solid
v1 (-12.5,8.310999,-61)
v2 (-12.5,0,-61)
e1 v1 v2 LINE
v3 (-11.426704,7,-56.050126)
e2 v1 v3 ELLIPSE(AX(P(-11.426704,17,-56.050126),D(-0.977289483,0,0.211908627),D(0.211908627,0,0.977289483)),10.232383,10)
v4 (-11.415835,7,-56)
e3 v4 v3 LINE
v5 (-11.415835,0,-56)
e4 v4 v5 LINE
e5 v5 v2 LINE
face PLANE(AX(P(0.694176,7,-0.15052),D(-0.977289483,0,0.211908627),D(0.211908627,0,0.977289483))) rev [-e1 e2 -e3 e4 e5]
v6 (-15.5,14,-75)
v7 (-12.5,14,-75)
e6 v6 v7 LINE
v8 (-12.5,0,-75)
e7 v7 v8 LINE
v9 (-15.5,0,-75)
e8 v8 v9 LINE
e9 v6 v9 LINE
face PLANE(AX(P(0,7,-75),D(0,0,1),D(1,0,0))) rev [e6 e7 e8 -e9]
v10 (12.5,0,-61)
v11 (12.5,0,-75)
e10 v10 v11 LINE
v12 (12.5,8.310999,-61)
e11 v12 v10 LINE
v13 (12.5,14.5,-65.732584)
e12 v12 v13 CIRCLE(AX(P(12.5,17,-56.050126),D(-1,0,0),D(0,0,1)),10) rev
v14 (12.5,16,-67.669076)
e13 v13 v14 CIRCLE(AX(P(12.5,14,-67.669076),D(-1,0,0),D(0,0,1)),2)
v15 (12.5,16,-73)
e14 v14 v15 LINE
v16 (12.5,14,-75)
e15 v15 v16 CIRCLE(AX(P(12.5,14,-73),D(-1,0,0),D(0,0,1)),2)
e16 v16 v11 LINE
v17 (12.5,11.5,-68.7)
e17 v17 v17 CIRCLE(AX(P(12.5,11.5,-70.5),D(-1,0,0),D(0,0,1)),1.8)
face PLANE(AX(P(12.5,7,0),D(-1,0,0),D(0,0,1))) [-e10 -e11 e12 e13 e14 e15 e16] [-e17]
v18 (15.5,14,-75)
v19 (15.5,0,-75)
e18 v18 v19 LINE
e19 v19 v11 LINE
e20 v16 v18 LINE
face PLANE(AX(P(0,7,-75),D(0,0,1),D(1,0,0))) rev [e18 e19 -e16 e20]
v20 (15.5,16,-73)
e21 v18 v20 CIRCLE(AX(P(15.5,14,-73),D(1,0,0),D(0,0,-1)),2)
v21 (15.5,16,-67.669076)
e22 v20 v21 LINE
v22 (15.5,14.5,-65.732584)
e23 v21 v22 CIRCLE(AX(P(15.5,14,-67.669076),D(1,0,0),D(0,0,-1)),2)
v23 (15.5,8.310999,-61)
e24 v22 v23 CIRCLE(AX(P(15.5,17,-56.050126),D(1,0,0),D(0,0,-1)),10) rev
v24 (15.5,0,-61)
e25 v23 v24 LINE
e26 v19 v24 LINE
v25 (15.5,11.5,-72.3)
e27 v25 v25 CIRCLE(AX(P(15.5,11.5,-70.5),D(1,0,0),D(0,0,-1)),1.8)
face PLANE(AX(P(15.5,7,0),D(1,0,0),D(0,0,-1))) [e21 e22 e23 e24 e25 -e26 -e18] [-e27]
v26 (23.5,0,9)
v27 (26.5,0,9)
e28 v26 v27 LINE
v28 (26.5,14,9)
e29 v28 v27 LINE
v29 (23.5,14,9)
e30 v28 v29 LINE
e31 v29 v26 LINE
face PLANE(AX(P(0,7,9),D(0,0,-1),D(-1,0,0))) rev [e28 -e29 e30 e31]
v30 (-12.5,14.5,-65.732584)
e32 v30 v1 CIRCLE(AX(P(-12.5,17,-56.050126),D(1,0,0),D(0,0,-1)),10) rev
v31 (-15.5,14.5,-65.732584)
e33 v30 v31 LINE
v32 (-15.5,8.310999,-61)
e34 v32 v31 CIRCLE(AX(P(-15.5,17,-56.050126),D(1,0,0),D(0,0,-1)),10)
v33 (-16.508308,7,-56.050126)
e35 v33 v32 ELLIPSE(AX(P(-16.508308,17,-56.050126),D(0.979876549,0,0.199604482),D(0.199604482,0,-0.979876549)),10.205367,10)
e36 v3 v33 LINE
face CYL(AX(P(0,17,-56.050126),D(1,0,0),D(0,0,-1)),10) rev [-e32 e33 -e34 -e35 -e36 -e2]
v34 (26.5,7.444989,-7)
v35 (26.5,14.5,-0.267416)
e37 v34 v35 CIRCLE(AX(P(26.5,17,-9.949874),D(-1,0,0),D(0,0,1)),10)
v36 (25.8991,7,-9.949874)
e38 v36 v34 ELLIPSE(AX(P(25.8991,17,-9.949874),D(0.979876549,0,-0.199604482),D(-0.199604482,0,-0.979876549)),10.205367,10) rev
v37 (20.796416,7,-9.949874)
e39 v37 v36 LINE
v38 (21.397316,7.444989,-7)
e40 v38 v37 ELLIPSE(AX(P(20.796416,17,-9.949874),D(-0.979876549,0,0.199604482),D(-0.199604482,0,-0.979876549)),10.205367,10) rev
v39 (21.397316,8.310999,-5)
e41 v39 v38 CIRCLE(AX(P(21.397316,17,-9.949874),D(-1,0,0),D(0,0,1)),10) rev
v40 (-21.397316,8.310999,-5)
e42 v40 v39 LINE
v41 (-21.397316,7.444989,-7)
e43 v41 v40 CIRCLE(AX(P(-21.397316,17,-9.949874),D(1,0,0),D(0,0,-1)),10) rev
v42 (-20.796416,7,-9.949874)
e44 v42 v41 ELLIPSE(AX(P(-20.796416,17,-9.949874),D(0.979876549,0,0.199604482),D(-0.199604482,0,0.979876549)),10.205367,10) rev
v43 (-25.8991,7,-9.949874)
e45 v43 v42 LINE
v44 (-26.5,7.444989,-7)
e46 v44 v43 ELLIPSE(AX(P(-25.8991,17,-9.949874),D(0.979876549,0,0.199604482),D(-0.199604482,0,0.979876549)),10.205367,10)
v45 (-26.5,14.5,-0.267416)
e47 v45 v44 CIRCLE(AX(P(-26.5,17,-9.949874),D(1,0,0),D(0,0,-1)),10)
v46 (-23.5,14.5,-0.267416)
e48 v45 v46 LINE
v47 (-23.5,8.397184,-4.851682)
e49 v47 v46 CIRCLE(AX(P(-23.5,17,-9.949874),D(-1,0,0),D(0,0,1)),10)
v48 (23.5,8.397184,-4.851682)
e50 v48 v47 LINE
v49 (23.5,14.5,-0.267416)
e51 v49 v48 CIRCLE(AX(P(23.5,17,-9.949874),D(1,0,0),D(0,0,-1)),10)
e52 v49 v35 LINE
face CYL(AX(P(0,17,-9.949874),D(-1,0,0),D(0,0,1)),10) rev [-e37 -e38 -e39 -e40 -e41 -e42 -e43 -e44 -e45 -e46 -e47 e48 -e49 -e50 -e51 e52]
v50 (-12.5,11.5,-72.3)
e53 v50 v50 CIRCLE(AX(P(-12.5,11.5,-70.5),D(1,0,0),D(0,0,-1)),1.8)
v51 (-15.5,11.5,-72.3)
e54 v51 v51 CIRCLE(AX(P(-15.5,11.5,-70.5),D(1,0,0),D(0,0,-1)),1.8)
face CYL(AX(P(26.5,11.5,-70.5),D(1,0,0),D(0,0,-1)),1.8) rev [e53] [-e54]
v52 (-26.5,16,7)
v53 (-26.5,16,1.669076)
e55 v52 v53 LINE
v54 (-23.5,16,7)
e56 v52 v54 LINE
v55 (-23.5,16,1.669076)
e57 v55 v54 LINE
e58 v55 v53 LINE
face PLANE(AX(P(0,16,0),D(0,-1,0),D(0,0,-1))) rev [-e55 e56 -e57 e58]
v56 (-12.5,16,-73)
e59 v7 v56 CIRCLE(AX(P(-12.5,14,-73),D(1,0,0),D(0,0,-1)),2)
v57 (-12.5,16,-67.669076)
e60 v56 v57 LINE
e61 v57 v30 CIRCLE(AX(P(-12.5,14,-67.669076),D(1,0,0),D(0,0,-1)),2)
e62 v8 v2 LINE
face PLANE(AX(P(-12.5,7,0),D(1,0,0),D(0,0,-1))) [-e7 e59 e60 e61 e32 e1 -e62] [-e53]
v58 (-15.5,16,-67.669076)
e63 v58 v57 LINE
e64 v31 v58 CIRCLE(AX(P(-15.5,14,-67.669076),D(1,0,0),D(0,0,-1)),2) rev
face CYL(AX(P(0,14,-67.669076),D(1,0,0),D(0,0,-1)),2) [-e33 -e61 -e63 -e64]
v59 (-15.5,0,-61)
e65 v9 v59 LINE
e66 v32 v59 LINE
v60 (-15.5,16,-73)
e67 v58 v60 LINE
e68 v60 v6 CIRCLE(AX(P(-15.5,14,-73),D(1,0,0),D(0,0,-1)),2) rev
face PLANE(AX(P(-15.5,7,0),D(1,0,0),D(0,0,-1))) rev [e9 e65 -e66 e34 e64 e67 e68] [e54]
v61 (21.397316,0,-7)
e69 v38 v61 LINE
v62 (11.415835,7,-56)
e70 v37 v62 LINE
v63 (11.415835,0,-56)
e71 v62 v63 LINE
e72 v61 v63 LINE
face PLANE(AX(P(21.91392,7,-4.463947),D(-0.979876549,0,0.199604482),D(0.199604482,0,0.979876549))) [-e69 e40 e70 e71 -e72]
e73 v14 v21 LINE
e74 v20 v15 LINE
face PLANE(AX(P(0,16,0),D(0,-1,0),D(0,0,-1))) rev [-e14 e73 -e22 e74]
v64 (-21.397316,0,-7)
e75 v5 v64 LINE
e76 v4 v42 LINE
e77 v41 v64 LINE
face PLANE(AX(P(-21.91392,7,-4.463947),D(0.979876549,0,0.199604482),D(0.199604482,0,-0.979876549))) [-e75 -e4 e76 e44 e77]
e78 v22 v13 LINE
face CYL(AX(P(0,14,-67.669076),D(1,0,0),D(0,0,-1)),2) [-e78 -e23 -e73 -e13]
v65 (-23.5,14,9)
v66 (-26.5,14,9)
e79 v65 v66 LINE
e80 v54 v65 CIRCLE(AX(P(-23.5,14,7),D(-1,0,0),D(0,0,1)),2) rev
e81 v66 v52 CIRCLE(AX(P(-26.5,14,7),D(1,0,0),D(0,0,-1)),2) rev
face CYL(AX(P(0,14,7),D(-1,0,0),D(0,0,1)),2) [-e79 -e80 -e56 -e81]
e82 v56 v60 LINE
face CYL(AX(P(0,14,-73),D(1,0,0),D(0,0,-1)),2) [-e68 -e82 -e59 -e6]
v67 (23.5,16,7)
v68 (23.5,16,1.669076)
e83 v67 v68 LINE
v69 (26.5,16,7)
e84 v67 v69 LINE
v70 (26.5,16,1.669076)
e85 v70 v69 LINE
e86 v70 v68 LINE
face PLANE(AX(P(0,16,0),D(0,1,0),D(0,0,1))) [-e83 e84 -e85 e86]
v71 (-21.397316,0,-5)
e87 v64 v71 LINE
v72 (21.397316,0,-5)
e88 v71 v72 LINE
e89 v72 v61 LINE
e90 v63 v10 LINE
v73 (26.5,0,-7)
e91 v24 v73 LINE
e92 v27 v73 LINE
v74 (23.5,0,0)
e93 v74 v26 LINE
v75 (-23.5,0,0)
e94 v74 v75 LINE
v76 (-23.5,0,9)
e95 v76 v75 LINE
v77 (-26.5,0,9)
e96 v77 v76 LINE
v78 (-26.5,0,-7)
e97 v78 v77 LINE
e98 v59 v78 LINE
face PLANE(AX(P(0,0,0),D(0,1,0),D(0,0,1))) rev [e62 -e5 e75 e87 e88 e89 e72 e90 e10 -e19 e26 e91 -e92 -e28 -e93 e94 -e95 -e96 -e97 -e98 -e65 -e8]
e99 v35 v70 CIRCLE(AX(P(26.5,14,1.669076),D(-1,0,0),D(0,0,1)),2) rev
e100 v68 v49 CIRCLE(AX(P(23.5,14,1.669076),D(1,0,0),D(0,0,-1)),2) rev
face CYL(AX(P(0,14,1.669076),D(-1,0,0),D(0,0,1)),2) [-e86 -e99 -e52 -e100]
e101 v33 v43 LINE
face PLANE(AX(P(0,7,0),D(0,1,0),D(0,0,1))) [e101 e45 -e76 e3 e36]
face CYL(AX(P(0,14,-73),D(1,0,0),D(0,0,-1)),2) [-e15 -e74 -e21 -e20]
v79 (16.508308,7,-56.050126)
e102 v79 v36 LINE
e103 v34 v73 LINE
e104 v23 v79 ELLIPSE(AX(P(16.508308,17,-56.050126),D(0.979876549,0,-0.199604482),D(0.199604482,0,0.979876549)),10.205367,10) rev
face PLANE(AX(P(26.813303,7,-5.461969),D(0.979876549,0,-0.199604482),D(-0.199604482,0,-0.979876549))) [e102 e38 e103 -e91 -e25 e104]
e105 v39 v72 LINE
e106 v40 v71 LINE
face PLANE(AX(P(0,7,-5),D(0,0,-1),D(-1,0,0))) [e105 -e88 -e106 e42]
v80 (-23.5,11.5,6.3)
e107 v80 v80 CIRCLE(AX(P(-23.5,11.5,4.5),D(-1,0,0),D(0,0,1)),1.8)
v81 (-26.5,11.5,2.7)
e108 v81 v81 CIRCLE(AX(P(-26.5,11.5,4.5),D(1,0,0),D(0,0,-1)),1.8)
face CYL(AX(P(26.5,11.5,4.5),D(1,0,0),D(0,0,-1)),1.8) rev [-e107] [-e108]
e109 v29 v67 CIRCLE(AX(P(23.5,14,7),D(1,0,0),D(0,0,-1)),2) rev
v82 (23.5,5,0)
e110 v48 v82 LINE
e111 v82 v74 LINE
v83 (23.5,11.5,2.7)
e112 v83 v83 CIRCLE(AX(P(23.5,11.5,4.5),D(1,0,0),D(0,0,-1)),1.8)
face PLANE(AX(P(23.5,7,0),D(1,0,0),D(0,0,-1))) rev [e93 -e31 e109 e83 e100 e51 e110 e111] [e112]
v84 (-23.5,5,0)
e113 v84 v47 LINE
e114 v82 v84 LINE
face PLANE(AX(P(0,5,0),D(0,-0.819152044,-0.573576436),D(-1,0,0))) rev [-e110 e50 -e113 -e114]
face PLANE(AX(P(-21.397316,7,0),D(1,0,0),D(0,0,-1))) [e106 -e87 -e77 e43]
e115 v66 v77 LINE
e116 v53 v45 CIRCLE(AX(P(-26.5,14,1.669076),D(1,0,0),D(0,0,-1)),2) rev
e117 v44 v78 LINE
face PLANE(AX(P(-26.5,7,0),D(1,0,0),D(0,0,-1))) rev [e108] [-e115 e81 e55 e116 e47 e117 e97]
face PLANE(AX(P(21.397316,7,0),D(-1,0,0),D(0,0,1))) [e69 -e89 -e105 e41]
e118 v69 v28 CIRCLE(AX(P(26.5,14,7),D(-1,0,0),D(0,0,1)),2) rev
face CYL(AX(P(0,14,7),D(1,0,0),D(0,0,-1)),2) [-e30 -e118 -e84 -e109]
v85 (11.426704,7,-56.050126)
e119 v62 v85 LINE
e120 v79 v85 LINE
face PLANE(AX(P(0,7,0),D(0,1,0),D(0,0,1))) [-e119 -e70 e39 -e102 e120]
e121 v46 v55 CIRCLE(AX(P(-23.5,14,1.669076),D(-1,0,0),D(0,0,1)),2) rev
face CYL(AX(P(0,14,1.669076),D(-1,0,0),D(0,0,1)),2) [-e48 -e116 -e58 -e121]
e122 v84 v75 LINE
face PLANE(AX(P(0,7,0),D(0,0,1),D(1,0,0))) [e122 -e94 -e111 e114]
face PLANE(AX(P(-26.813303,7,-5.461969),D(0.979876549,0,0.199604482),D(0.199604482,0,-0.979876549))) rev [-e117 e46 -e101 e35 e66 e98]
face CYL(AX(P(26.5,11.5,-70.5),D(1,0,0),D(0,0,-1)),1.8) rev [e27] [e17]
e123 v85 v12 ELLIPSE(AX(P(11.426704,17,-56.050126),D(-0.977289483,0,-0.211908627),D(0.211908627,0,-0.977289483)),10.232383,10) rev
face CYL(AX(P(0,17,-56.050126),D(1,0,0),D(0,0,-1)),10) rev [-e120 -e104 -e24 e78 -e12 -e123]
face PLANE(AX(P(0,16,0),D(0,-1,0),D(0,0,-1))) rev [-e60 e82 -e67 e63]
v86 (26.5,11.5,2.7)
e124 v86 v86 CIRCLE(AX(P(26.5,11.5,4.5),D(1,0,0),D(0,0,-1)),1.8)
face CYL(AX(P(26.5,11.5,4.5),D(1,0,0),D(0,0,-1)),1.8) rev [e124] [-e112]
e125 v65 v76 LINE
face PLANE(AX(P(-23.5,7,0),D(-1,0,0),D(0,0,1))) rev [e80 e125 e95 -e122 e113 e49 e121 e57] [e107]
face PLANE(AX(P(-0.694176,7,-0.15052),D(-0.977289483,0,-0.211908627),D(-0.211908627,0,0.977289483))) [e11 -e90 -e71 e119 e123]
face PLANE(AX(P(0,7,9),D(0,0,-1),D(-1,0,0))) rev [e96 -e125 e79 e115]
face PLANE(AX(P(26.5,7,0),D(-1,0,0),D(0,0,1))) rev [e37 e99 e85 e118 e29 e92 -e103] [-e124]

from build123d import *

# Parameters (mm, degrees)
BOSS_EXTRUDE1_DEPTH  = 7
BOSS_EXTRUDE2_START  = 7
SKETCH1_3_W          = 3
SKETCH1_3_H          = 9
BOSS_EXTRUDE2_DEPTH  = 9
M3_CLEARANCE_HOLE1_D = 3.6
CHAMFER1_SIZE        = 2
CHAMFER1_SIZE2       = 2.856296013
FILLET1_R            = 10
FILLET2_R            = 2


with BuildPart() as part:
    # Sketch1 → Boss-Extrude1 (new body)
    with BuildSketch(Plane(origin=(0, 0, 0), x_dir=(1, 0, 0), z_dir=(0, 1, 0))):
        Polygon((-23.5, -9), (-23.5, 0), (23.5, 0), (23.5, -9), (26.5, -9), (26.5, 7), (15.5, 61), (15.5, 75), (12.5, 75), (12.5, 61), (11.415834914, 56), (21.397316395, 7), (21.397316395, 5), (-21.397316395, 5), (-21.397316395, 7), (-11.415834914, 56), (-12.5, 61), (-12.5, 75), (-15.5, 75), (-15.5, 61), (-26.5, 7), (-26.5, -9), align=None)
    extrude(amount=BOSS_EXTRUDE1_DEPTH)

    # Sketch1<3> → Boss-Extrude2 (add)
    with BuildSketch(Plane(origin=(0, 0, 0), x_dir=(1, 0, 0), z_dir=(0, 1, 0)).offset(BOSS_EXTRUDE2_START)):
        with Locations((-14, 70.5)):
            Rectangle(SKETCH1_3_W, SKETCH1_3_H)
        with Locations((14, 70.5)):
            Rectangle(SKETCH1_3_W, SKETCH1_3_H)
        with Locations((-25, -4.5)):
            Rectangle(SKETCH1_3_W, SKETCH1_3_H)
        with Locations((25, -4.5)):
            Rectangle(SKETCH1_3_W, SKETCH1_3_H)
    extrude(amount=BOSS_EXTRUDE2_DEPTH)

    # M3 Clearance Hole1 (through all)
    with Locations(Plane(origin=(26.5, 0, 0), x_dir=(0, 0, -1), z_dir=(1, 0, 0))):
        with Locations((-4.5, 11.5), (70.5, 11.5)):
            Hole(M3_CLEARANCE_HOLE1_D / 2)

    # Chamfer1
    chamfer1_edges = [part.edges().sort_by_distance(p)[0] for p in [
        (0, 7, 0),
    ]]
    chamfer1_side = [part.faces().sort_by_distance(p)[0] for p in [
        (0, 3.5, 0),
    ]]
    chamfer(chamfer1_edges, length=CHAMFER1_SIZE, length2=CHAMFER1_SIZE2, reference=chamfer1_side[0])

    # Fillet1
    # the kernel refuses this fillet: 10 mm, written as the material it adds along each edge
    with BuildSketch(Plane(origin=(-1.374685928, 7, 0), x_dir=(0, 0, -1), z_dir=(1, 0, 0))) as fillet1_piece_1_section:
        with BuildLine():
            CenterArc((9.949874371, 10), FILLET1_R, 185.739170477, 84.260829523)
            Line((0, 9), (0, 0))
            Line((0, 0), (9.949874371, 0))
        make_face()
    fillet1_piece_1 = extrude(amount=27.874685928, mode=Mode.PRIVATE)
    fillet1_piece_1 = split(fillet1_piece_1, bisect_by=Plane(origin=(10.011315234, 8.407248867, -4.866055679), z_dir=(0, -0.819152044288993, -0.5735764363510445)), keep=Keep.TOP, mode=Mode.PRIVATE)
    fillet1_piece_1 = split(fillet1_piece_1, bisect_by=Plane(origin=(10.011315234, 8.336481062, -5), z_dir=(0, 0, 1)), keep=Keep.TOP, mode=Mode.PRIVATE)
    add(fillet1_piece_1)
    with BuildSketch(Plane(origin=(-1.374685928, 7, 0), x_dir=(0, 0, -1), z_dir=(1, 0, 0))) as fillet1_piece_2_section:
        with BuildLine():
            CenterArc((9.949874371, 10), FILLET1_R, 185.739170477, 84.260829523)
            Line((0, 9), (0, 0))
            Line((0, 0), (9.949874371, 0))
        make_face()
    fillet1_piece_2 = extrude(amount=27.874685928, mode=Mode.PRIVATE)
    fillet1_piece_2 = split(fillet1_piece_2, bisect_by=Plane(origin=(26.506585427, 7.804991574, -6.967671542), z_dir=(-0.9798765487080173, 0, 0.19960448214422577)), keep=Keep.TOP, mode=Mode.PRIVATE)
    fillet1_piece_2 = split(fillet1_piece_2, bisect_by=Plane(origin=(21.601020113, 7.804991574, -5), z_dir=(0, 0, -1)), keep=Keep.TOP, mode=Mode.PRIVATE)
    fillet1_piece_2 = split(fillet1_piece_2, bisect_by=Plane(origin=(21.397316395, 7.804991574, -5.968389718), z_dir=(1, 0, 0)), keep=Keep.TOP, mode=Mode.PRIVATE)
    add(fillet1_piece_2)
    with BuildSketch(Plane(origin=(-1.374685928, 7, 0), x_dir=(0, 0, -1), z_dir=(1, 0, 0))) as fillet1_piece_3_section:
        with BuildLine():
            CenterArc((9.949874371, 10), FILLET1_R, 185.739170477, 84.260829523)
            Line((0, 9), (0, 0))
            Line((0, 0), (9.949874371, 0))
        make_face()
    fillet1_piece_3 = extrude(amount=52.749371855, mode=Mode.PRIVATE)
    fillet1_piece_3 = split(fillet1_piece_3, bisect_by=Plane(origin=(20.913958027, 7.01045348, -9.37285017), z_dir=(0.9798765487080173, 0, -0.1996044821442258)), keep=Keep.TOP, mode=Mode.PRIVATE)
    fillet1_piece_3 = split(fillet1_piece_3, bisect_by=Plane(origin=(21.397316395, 7.01045348, -9.450911129), z_dir=(-1, 0, 0)), keep=Keep.TOP, mode=Mode.PRIVATE)
    add(fillet1_piece_3)
    with BuildSketch(Plane(origin=(23.5, 7, 0), x_dir=(0, 0, -1), z_dir=(1, 0, 0))) as fillet1_piece_4_section:
        with BuildLine():
            CenterArc((9.949874371, 10), FILLET1_R, 185.739170477, 84.260829523)
            Line((0, 9), (0, 0))
            Line((0, 0), (9.949874371, 0))
        make_face()
    fillet1_piece_4 = extrude(amount=3, mode=Mode.PRIVATE)
    fillet1_piece_4 = split(fillet1_piece_4, bisect_by=Plane(origin=(25, 11.609815369, -5), z_dir=(0, 0, 1)), keep=Keep.TOP, mode=Mode.PRIVATE)
    add(fillet1_piece_4)
    with BuildSketch(Plane(origin=(-15.5, 7, -66), x_dir=(0, 0, 1), z_dir=(1, 0, 0))) as fillet1_piece_5_section:
        with BuildLine():
            CenterArc((9.949874371, -10), FILLET1_R, 90, 84.260829523)
            Line((0, -9), (0, 0))
            Line((0, 0), (9.949874371, 0))
        make_face()
    fillet1_piece_5 = extrude(amount=27.874685928, mode=Mode.PRIVATE)
    fillet1_piece_5 = split(fillet1_piece_5, bisect_by=Plane(origin=(-13.326382184, 11.537566275, -64.811145527), z_dir=(-0.9772894830316591, 0, 0.21190862737442448)), keep=Keep.TOP, mode=Mode.PRIVATE)
    add(fillet1_piece_5)
    with BuildSketch(Plane(origin=(-40.374685928, 7, -66), x_dir=(0, 0, 1), z_dir=(1, 0, 0))) as fillet1_piece_6_section:
        with BuildLine():
            CenterArc((9.949874371, -10), FILLET1_R, 90, 84.260829523)
            Line((0, -9), (0, 0))
            Line((0, 0), (9.949874371, 0))
        make_face()
    fillet1_piece_6 = extrude(amount=27.874685928, mode=Mode.PRIVATE)
    fillet1_piece_6 = split(fillet1_piece_6, bisect_by=Plane(origin=(-16.305903703, 7.017292707, -57.04374546), z_dir=(0.9798765487080173, 0, 0.19960448214422577)), keep=Keep.TOP, mode=Mode.PRIVATE)
    add(fillet1_piece_6)
    with BuildSketch(Plane(origin=(-40.374685928, 7, -66), x_dir=(0, 0, 1), z_dir=(1, 0, 0))) as fillet1_piece_7_section:
        with BuildLine():
            CenterArc((9.949874371, -10), FILLET1_R, 90, 84.260829523)
            Line((0, -9), (0, 0))
            Line((0, 0), (9.949874371, 0))
        make_face()
    fillet1_piece_7 = extrude(amount=52.749371855, mode=Mode.PRIVATE)
    fillet1_piece_7 = split(fillet1_piece_7, bisect_by=Plane(origin=(11.618519357, 7.008478839, -56.93474899), z_dir=(0.977289483031659, 0, 0.2119086273744248)), keep=Keep.TOP, mode=Mode.PRIVATE)
    add(fillet1_piece_7)
    with BuildSketch(Plane(origin=(-12.374685928, 7, -66), x_dir=(0, 0, 1), z_dir=(1, 0, 0))) as fillet1_piece_8_section:
        with BuildLine():
            CenterArc((9.949874371, -10), FILLET1_R, 90, 84.260829523)
            Line((0, -9), (0, 0))
            Line((0, 0), (9.949874371, 0))
        make_face()
    fillet1_piece_8 = extrude(amount=52.749371855, mode=Mode.PRIVATE)
    fillet1_piece_8 = split(fillet1_piece_8, bisect_by=Plane(origin=(-11.604329561, 7.008478839, -56.869307865), z_dir=(-0.9772894830316591, 0, 0.21190862737442448)), keep=Keep.TOP, mode=Mode.PRIVATE)
    add(fillet1_piece_8)
    with BuildSketch(Plane(origin=(12.5, 7, -66), x_dir=(0, 0, 1), z_dir=(1, 0, 0))) as fillet1_piece_9:
        with BuildLine():
            CenterArc((9.949874371, -10), FILLET1_R, 90, 84.260829523)
            Line((0, -9), (0, 0))
            Line((0, 0), (9.949874371, 0))
        make_face()
    extrude(amount=3)
    with BuildSketch(Plane(origin=(-12.374685928, 7, -66), x_dir=(0, 0, 1), z_dir=(1, 0, 0))) as fillet1_piece_10_section:
        with BuildLine():
            CenterArc((9.949874371, -10), FILLET1_R, 90, 84.260829523)
            Line((0, -9), (0, 0))
            Line((0, 0), (9.949874371, 0))
        make_face()
    fillet1_piece_10 = extrude(amount=52.749371855, mode=Mode.PRIVATE)
    fillet1_piece_10 = split(fillet1_piece_10, bisect_by=Plane(origin=(16.17255533, 7.017292707, -57.698364743), z_dir=(-0.9798765487080173, 0, 0.19960448214422577)), keep=Keep.TOP, mode=Mode.PRIVATE)
    fillet1_piece_10 = split(fillet1_piece_10, bisect_by=Plane(origin=(11.645733853, 7.017292707, -57.060257993), z_dir=(0.977289483031659, 0, 0.2119086273744248)), keep=Keep.TOP, mode=Mode.PRIVATE)
    add(fillet1_piece_10)
    with BuildSketch(Plane(origin=(1.374685928, 7, 0), x_dir=(0, 0, -1), z_dir=(-1, 0, 0))) as fillet1_piece_11_section:
        with BuildLine():
            CenterArc((9.949874371, -10), FILLET1_R, 90, 84.260829523)
            Line((0, -9), (0, 0))
            Line((0, 0), (9.949874371, 0))
        make_face()
    fillet1_piece_11 = extrude(amount=27.874685928, mode=Mode.PRIVATE)
    fillet1_piece_11 = split(fillet1_piece_11, bisect_by=Plane(origin=(-10.011315234, 8.407248867, -4.866055679), z_dir=(0, -0.819152044288993, -0.5735764363510445)), keep=Keep.TOP, mode=Mode.PRIVATE)
    fillet1_piece_11 = split(fillet1_piece_11, bisect_by=Plane(origin=(-10.011315234, 8.336481062, -5), z_dir=(0, 0, 1)), keep=Keep.TOP, mode=Mode.PRIVATE)
    add(fillet1_piece_11)
    with BuildSketch(Plane(origin=(1.374685928, 7, 0), x_dir=(0, 0, -1), z_dir=(-1, 0, 0))) as fillet1_piece_12_section:
        with BuildLine():
            CenterArc((9.949874371, -10), FILLET1_R, 90, 84.260829523)
            Line((0, -9), (0, 0))
            Line((0, 0), (9.949874371, 0))
        make_face()
    fillet1_piece_12 = extrude(amount=27.874685928, mode=Mode.PRIVATE)
    fillet1_piece_12 = split(fillet1_piece_12, bisect_by=Plane(origin=(-26.506585427, 7.804991574, -6.967671542), z_dir=(0.9798765487080173, 0, 0.19960448214422577)), keep=Keep.TOP, mode=Mode.PRIVATE)
    fillet1_piece_12 = split(fillet1_piece_12, bisect_by=Plane(origin=(-21.397316395, 7.804991574, -5.968389718), z_dir=(-1, 0, 0)), keep=Keep.TOP, mode=Mode.PRIVATE)
    fillet1_piece_12 = split(fillet1_piece_12, bisect_by=Plane(origin=(-21.601020113, 7.804991574, -5), z_dir=(0, 0, -1)), keep=Keep.TOP, mode=Mode.PRIVATE)
    add(fillet1_piece_12)
    with BuildSketch(Plane(origin=(1.374685928, 7, 0), x_dir=(0, 0, -1), z_dir=(-1, 0, 0))) as fillet1_piece_13_section:
        with BuildLine():
            CenterArc((9.949874371, -10), FILLET1_R, 90, 84.260829523)
            Line((0, -9), (0, 0))
            Line((0, 0), (9.949874371, 0))
        make_face()
    fillet1_piece_13 = extrude(amount=27.874685928, mode=Mode.PRIVATE)
    fillet1_piece_13 = split(fillet1_piece_13, bisect_by=Plane(origin=(-25.813340771, 7.01045348, -10.370872581), z_dir=(0.9798765487080173, 0, 0.19960448214422577)), keep=Keep.TOP, mode=Mode.PRIVATE)
    fillet1_piece_13 = split(fillet1_piece_13, bisect_by=Plane(origin=(-20.913958027, 7.01045348, -9.37285017), z_dir=(-0.9798765487080173, 0, -0.19960448214422577)), keep=Keep.TOP, mode=Mode.PRIVATE)
    fillet1_piece_13 = split(fillet1_piece_13, bisect_by=Plane(origin=(-21.297166367, 7.01045348, -5), z_dir=(0, 0, -1)), keep=Keep.TOP, mode=Mode.PRIVATE)
    add(fillet1_piece_13)
    with BuildSketch(Plane(origin=(-23.5, 7, 0), x_dir=(0, 0, -1), z_dir=(-1, 0, 0))) as fillet1_piece_14_section:
        with BuildLine():
            CenterArc((9.949874371, -10), FILLET1_R, 90, 84.260829523)
            Line((0, -9), (0, 0))
            Line((0, 0), (9.949874371, 0))
        make_face()
    fillet1_piece_14 = extrude(amount=3, mode=Mode.PRIVATE)
    fillet1_piece_14 = split(fillet1_piece_14, bisect_by=Plane(origin=(-25, 11.609815369, -5), z_dir=(0, 0, 1)), keep=Keep.TOP, mode=Mode.PRIVATE)
    add(fillet1_piece_14)

    # Fillet2
    fillet2_edges = [part.edges().sort_by_distance(p)[0] for p in [
        (25, 16, 9),
        (25, 16, 0),
        (-14, 16, -75),
        (-14, 16, -66),
        (14, 16, -75),
        (14, 16, -66),
        (-25, 16, 9),
        (-25, 16, 0),
    ]]
    fillet(fillet2_edges, radius=FILLET2_R)


solid = part.part
